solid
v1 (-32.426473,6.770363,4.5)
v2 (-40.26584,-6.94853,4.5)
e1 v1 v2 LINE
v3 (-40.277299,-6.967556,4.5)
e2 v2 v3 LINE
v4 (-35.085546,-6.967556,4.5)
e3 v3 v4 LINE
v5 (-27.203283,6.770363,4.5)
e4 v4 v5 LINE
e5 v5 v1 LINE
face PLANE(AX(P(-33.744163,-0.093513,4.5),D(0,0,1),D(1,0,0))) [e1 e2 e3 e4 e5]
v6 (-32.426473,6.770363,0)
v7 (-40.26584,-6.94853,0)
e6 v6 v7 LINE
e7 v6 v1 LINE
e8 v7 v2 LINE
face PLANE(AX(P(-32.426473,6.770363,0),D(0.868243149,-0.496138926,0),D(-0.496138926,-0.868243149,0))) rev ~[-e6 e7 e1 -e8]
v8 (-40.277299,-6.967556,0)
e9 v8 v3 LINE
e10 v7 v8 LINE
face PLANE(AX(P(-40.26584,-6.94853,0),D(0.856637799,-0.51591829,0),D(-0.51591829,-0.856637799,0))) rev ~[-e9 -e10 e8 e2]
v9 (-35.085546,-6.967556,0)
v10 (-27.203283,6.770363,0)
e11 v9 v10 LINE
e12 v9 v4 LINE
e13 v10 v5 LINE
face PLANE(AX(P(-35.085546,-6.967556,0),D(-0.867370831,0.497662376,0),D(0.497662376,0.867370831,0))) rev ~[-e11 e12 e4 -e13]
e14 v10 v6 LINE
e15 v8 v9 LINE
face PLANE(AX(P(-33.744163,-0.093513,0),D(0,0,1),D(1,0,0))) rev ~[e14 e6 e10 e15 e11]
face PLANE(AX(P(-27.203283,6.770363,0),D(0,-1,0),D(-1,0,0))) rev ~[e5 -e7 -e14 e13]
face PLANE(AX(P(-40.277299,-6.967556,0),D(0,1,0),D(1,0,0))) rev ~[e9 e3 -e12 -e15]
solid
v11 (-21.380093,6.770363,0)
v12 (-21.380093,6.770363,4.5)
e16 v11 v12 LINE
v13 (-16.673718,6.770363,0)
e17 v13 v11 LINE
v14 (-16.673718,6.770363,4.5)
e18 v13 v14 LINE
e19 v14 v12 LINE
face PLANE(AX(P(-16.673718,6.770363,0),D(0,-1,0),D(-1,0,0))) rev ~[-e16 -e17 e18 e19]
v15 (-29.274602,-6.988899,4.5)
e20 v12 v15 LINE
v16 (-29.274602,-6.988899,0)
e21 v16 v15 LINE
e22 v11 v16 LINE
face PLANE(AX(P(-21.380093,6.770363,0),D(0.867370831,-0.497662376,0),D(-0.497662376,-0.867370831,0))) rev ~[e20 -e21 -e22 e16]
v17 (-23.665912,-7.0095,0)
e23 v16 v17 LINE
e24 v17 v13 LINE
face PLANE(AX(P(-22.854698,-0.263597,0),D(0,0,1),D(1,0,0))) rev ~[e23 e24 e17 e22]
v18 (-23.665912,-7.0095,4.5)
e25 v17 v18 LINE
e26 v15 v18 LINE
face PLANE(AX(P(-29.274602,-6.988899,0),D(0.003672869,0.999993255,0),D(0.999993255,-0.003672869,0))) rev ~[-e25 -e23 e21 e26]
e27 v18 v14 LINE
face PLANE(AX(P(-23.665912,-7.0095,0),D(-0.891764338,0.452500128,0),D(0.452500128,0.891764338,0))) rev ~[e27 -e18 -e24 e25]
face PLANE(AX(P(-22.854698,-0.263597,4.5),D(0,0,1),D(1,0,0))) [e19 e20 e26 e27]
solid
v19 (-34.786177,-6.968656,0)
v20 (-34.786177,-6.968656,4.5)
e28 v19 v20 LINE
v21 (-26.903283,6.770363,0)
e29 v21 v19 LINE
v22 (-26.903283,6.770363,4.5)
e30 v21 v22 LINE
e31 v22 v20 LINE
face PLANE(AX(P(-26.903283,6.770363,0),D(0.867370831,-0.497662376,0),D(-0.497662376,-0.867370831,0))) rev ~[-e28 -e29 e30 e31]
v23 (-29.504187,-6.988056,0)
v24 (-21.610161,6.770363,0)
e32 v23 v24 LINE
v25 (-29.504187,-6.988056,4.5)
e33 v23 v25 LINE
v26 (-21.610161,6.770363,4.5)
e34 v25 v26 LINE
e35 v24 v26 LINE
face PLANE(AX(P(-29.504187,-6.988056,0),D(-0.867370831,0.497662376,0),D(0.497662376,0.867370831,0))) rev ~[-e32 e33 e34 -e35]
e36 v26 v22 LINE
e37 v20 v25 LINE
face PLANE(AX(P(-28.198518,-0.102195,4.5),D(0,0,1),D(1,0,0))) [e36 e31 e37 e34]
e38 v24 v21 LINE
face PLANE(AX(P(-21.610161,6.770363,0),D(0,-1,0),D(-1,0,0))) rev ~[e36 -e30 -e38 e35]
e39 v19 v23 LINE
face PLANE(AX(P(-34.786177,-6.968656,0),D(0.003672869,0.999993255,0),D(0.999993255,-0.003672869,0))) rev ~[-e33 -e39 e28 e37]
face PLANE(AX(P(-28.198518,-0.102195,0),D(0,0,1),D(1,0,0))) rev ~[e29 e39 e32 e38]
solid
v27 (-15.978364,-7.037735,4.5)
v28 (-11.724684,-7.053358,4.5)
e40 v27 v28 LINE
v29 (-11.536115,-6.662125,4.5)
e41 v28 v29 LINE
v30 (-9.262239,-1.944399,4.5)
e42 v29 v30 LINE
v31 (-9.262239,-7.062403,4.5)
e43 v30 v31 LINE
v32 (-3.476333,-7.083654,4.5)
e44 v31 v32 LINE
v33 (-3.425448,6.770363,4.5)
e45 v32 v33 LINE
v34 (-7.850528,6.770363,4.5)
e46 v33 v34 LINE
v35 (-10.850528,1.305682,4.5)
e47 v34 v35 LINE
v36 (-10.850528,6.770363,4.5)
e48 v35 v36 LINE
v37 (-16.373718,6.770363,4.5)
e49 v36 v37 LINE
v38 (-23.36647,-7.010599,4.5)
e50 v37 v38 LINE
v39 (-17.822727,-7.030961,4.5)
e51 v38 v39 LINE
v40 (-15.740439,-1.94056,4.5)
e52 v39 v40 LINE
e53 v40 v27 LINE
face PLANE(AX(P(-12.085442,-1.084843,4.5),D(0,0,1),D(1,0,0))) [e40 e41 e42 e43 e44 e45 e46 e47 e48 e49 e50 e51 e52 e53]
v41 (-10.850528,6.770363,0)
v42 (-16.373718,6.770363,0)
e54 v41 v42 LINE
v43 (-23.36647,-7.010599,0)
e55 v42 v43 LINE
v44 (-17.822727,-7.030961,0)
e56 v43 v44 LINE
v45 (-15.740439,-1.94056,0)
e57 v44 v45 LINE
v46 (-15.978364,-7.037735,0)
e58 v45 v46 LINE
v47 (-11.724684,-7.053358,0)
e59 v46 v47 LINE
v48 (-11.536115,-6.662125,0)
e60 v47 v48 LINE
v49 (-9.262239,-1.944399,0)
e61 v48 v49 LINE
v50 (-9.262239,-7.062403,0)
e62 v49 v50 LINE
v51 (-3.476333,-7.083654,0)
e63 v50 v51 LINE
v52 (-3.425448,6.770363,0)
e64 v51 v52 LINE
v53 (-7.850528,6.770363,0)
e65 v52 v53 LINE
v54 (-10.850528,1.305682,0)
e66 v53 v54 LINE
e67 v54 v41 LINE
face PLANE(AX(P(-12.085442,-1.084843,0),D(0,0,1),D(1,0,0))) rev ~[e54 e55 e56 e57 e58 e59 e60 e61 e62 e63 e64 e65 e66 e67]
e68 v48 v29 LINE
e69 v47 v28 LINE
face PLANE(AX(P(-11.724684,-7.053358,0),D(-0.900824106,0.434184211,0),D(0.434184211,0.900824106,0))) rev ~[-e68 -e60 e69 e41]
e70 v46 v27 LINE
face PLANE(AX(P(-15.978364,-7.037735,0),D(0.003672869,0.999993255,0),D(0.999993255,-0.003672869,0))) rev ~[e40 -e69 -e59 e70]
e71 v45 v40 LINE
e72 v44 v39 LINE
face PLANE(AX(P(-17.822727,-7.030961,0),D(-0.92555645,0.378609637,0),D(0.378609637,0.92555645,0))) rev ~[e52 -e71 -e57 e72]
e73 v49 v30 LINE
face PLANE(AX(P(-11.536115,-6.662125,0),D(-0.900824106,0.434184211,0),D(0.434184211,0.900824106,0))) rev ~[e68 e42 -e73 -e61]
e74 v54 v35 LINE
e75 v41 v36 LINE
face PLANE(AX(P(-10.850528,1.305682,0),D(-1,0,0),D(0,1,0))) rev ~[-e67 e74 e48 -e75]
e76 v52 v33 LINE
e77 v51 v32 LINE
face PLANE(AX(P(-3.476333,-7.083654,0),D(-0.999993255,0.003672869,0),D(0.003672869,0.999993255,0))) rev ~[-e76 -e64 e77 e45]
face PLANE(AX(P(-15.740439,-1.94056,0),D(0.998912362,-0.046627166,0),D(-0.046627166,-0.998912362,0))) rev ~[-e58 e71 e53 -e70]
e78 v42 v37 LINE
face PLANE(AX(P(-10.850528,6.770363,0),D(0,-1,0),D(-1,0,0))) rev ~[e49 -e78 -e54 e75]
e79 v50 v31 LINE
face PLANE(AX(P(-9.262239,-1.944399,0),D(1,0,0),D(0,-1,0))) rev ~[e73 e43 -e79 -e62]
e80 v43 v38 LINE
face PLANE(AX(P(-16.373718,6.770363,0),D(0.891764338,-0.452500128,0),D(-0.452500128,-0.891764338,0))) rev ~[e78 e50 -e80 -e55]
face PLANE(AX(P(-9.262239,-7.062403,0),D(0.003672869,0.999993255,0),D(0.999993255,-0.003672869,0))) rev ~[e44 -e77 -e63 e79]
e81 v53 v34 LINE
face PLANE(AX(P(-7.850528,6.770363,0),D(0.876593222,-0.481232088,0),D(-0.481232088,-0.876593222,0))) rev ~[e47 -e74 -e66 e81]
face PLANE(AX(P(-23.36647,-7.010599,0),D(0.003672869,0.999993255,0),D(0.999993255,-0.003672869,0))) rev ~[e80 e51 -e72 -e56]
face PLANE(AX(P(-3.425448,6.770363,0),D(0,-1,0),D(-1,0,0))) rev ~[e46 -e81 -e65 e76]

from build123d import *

# Parameters (mm, degrees)
F1_DEPTH = 4.5


# Not quite as in the source:
# - a feature names something its author has since deleted; it is built from what else it names


with BuildPart() as f1:
    # F0 (on Top) → F1 (new body)
    with BuildSketch(Plane.XY):
        Polygon((-3.4254482334, 6.7703626119), (-7.8505282334, 6.7703626119), (-10.8505282334, 1.3056819865), (-10.8505282334, 6.7703626119), (-16.3737182334, 6.7703626119), (-23.3664704371, -7.0105993377), (-17.822726575, -7.0309609225), (-15.7404388942, -1.9405601371), (-15.978364491, -7.0377350693), (-11.7246839348, -7.053358388), (-11.5361148701, -6.6621245411), (-9.2622392988, -1.9443990291), (-9.2622392988, -7.0624026867), (-3.4763325698, -7.08365371), align=None)
    extrude(amount=F1_DEPTH)


with BuildPart() as f1b:
    # F0 (on Top) → F1, piece 2 (new body)
    with BuildSketch(Plane.XY):
        Polygon((-32.4264727533, 6.7703626119), (-40.2658395469, -6.9485297427), (-40.2772985399, -6.9675564117), (-35.0855463293, -6.9675564117), (-27.203282851, 6.7703626119), align=None)
    extrude(amount=F1_DEPTH)


with BuildPart() as f1c:
    # F0 (on Top) → F1, piece 3 (new body)
    with BuildSketch(Plane.XY):
        Polygon((-21.6101612896, 6.7703626119), (-26.903282851, 6.7703626119), (-34.7861772074, -6.9686559628), (-29.5041866934, -6.9880561552), align=None)
    extrude(amount=F1_DEPTH)


with BuildPart() as f1d:
    # F0 (on Top) → F1, piece 4 (new body)
    with BuildSketch(Plane.XY):
        Polygon((-16.6737182334, 6.7703626119), (-21.380092851, 6.7703626119), (-29.2746020719, -6.9888993952), (-23.6659123659, -7.0094995192), align=None)
    extrude(amount=F1_DEPTH)


solid = Compound([f1.part, f1b.part, f1c.part, f1d.part])
